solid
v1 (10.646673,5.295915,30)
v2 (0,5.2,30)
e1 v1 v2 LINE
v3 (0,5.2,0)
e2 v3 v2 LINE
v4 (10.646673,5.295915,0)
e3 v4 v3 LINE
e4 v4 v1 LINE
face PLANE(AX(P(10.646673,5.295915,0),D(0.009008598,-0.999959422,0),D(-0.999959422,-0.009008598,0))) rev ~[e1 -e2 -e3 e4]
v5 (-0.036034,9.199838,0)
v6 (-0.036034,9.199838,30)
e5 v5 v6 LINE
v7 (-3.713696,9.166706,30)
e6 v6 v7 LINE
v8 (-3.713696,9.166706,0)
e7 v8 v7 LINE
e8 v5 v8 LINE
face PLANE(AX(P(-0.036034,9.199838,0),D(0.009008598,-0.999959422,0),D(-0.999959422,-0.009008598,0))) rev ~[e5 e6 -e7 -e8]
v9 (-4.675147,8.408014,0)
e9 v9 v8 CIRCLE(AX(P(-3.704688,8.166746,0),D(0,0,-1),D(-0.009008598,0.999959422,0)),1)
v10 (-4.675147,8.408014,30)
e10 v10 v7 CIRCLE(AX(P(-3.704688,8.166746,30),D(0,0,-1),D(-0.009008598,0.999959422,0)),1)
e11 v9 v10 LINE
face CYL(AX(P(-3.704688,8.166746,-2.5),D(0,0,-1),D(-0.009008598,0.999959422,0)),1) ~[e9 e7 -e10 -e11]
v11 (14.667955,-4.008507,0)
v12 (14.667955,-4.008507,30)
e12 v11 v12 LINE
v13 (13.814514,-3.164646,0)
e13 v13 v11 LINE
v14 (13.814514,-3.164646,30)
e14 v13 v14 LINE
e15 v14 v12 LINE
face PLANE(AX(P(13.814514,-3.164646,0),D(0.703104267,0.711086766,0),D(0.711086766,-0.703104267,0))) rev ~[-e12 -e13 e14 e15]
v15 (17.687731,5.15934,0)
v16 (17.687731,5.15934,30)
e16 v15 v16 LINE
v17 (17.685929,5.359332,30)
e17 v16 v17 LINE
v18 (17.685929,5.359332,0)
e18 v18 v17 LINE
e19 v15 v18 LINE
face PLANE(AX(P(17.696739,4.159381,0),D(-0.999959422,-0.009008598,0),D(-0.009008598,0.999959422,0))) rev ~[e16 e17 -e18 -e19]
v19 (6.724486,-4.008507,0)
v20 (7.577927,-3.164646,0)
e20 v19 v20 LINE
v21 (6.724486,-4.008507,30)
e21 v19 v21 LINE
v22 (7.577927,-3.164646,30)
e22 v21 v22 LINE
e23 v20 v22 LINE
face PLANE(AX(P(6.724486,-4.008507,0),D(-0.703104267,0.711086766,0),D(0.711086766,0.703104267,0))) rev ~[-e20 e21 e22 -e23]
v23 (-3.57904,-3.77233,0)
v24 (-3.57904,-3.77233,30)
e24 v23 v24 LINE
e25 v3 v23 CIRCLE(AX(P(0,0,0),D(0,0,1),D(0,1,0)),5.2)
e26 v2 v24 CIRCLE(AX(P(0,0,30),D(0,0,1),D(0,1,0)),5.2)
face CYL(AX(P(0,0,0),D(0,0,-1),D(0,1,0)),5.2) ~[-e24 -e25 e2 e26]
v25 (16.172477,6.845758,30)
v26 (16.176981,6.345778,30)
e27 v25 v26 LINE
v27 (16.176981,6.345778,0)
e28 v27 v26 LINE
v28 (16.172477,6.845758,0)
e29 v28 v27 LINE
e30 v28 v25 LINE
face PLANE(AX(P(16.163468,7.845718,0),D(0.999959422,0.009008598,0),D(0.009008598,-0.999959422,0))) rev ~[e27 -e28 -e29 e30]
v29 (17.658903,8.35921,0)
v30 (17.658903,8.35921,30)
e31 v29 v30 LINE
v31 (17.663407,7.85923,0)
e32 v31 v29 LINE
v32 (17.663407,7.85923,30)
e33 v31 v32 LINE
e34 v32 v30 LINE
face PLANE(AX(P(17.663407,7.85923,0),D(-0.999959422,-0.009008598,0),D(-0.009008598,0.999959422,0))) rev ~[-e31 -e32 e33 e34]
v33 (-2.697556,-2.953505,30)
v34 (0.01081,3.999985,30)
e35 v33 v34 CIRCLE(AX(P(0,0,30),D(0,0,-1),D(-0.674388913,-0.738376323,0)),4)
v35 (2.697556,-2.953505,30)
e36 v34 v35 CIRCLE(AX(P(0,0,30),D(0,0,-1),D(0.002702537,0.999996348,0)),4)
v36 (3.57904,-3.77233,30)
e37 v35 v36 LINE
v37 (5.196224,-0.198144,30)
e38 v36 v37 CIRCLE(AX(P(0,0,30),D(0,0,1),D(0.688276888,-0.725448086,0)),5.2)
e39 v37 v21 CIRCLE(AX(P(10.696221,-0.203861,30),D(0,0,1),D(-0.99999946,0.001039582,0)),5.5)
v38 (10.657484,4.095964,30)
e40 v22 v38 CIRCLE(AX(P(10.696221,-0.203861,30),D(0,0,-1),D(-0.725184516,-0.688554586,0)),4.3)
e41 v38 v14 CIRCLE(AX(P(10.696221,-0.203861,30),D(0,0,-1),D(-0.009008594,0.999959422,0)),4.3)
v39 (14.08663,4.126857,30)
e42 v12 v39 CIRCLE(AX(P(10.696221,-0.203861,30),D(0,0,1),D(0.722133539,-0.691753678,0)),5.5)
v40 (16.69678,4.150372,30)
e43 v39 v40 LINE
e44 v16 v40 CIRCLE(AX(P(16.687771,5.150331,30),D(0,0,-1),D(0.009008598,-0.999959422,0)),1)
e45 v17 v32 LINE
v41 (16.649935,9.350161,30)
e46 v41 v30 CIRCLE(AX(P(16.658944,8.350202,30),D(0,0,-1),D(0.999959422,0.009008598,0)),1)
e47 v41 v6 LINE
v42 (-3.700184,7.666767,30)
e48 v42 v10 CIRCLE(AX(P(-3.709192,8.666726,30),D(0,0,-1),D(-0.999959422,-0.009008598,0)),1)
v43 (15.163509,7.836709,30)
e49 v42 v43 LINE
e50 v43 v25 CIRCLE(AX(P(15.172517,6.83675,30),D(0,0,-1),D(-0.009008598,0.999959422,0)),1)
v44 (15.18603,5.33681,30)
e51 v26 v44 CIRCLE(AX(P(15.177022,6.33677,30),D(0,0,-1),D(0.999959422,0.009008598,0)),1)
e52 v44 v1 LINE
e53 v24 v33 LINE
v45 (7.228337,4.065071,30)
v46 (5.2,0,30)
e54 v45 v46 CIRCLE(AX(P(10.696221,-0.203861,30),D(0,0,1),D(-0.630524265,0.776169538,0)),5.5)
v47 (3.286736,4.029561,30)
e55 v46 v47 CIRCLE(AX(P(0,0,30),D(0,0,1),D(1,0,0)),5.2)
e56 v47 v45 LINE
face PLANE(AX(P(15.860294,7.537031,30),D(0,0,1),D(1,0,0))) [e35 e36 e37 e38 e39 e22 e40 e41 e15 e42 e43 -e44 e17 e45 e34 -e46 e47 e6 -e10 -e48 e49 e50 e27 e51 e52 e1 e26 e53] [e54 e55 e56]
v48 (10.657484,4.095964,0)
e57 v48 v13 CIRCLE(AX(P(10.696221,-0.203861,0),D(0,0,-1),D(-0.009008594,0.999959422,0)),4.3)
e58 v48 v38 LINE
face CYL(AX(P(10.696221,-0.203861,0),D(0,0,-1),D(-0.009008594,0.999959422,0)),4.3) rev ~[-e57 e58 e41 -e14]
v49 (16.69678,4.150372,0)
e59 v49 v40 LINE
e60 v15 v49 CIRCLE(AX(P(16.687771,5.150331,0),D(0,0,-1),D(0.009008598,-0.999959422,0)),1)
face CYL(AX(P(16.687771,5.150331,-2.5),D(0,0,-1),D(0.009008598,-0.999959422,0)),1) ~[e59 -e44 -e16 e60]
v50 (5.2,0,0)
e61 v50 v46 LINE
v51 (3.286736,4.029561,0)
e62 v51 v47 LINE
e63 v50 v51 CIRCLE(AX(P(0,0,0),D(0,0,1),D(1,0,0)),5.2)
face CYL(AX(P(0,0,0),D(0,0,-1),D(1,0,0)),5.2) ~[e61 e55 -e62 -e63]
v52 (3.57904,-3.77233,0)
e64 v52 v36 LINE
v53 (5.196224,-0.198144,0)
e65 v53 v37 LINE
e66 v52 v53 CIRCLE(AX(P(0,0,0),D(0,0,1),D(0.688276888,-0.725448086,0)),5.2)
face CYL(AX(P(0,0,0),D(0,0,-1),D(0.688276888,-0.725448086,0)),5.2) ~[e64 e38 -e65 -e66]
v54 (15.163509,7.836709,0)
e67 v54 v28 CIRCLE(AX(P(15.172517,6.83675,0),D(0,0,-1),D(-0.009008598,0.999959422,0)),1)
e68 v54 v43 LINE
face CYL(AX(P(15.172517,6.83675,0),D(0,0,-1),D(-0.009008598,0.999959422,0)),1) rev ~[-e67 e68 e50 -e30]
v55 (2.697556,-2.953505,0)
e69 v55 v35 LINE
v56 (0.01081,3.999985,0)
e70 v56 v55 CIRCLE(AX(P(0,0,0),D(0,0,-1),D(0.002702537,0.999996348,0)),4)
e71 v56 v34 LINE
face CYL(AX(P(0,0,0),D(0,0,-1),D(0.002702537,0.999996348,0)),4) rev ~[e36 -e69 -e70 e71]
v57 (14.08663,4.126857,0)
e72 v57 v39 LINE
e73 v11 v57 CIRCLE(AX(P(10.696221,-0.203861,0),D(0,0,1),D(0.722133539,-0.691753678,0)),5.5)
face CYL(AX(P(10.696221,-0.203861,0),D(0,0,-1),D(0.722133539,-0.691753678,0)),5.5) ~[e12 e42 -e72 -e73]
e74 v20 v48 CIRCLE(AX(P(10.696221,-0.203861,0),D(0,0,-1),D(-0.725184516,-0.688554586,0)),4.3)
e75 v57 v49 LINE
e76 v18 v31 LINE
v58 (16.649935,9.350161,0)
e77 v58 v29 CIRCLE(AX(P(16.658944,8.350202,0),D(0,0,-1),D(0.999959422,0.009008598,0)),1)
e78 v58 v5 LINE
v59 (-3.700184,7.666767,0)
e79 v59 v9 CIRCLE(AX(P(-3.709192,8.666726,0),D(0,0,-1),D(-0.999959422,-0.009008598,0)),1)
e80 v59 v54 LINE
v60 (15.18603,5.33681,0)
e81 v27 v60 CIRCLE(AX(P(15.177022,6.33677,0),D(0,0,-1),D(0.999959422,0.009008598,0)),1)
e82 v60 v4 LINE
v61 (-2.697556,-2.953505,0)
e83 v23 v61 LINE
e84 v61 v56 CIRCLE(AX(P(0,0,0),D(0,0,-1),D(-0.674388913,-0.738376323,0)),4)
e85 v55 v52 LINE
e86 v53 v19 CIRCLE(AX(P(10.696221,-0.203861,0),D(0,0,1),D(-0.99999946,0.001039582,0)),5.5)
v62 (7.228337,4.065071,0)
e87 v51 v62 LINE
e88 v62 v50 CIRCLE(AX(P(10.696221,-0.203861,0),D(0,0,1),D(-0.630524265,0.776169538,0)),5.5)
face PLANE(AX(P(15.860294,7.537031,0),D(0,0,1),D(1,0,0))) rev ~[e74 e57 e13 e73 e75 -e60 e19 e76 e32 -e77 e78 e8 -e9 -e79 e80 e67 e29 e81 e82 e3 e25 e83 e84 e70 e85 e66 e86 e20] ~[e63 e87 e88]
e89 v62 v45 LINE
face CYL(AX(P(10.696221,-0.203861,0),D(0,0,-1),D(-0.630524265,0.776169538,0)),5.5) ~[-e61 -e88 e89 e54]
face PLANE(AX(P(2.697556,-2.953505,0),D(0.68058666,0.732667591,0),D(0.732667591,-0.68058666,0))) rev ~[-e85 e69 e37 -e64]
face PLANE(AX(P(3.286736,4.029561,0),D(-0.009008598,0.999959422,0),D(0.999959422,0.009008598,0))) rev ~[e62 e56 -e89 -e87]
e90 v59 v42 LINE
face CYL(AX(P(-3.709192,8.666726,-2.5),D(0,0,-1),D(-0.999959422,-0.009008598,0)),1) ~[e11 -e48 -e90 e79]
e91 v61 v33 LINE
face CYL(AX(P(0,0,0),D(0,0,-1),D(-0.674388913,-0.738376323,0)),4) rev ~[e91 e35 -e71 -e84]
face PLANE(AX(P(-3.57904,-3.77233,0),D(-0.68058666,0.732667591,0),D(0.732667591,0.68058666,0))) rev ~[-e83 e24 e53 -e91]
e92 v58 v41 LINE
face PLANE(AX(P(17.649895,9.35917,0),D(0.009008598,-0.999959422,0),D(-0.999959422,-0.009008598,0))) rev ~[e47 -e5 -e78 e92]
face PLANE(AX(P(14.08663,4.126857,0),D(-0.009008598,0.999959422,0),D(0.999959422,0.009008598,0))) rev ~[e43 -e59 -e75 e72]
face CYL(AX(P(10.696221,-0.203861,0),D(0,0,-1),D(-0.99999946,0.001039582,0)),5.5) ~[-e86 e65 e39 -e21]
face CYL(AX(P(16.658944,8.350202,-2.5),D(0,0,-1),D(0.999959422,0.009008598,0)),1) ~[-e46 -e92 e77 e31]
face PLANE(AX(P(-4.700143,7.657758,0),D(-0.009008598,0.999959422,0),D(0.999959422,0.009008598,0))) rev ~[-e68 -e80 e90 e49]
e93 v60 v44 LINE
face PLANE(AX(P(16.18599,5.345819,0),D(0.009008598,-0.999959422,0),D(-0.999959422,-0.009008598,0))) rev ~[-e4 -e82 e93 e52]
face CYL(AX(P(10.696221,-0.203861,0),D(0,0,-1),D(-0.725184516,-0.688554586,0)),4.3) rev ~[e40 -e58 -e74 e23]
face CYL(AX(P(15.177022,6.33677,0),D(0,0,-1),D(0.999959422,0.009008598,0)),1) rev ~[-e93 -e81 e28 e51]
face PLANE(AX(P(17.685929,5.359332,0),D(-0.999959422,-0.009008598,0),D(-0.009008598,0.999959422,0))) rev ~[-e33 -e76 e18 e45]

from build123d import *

# Parameters (mm, degrees)
F1_DEPTH    = 30
F2_T1_DEPTH = 30
F2_T3_DEPTH = 35


# Not quite as in the source:
# - a fillet or chamfer that OpenCascade refuses, or shapes differently, is made with other operations: its cross-section is extruded or revolved along the edge and cut away or added
# - ends of sketch curves that miss each other by under 0.0002 mm in the source are joined


with BuildPart() as f1:
    # F0 (on Top) → F1 (new body)
    with BuildSketch(Plane.XY):
        with BuildLine():
            ThreePointArc((0.0108101467, 3.9999853926), (3.7311619501, 1.441676282), (2.6975556514, -2.9535052916))
            Line((2.6975556514, -2.9535052916), (3.5790398152, -3.7723300494))
            ThreePointArc((3.5790398152, -3.7723300494), (4.7376169007, -2.1435918693), (5.1962235425, -0.1981436252))
            ThreePointArc((5.1962235425, -0.1981436252), (5.1972192437, -0.0990548017), (5.2, 0))
            ThreePointArc((5.2, 0), (4.6973944029, 2.2303555374), (3.2867362218, 4.0295613915))
            Line((3.2867362218, 4.0295613915), (0.0108101467, 3.9999853926))
        make_face()
        with BuildLine():
            ThreePointArc((-2.6975556514, -2.9535052916), (-3.7272521414, 1.4517546193), (0.0108101467, 3.9999853926))
            Line((0.0108101467, 3.9999853926), (3.2867362218, 4.0295613915))
            ThreePointArc((3.2867362218, 4.0295613915), (1.7444599113, 4.8986589612), (0, 5.2))
            ThreePointArc((0, 5.2), (-4.8299128489, 1.9266400472), (-3.5790398152, -3.7723300494))
            Line((-3.5790398152, -3.7723300494), (-2.6975556514, -2.9535052916))
        make_face()
        with BuildLine():
            ThreePointArc((0, 5.2), (1.7444599113, 4.8986589612), (3.2867362218, 4.0295613915))
            Line((3.2867362218, 4.0295613915), (7.2283371129, 4.065071131))
            ThreePointArc((7.2283371129, 4.065071131), (8.8329374117, 4.9709020374), (10.646673336, 5.2959154939))
            Line((10.646673336, 5.2959154939), (0, 5.2))
        make_face()
        with BuildLine():
            ThreePointArc((5.2, 0), (5.1972192437, -0.0990548017), (5.1962235425, -0.1981436252))
            ThreePointArc((5.1962235425, -0.1981436252), (5.1990557999, -0.099089805), (5.2, 0))
        make_face()
        with BuildLine():
            ThreePointArc((5.2, 0), (5.1990557999, -0.099089805), (5.1962235425, -0.1981436252))
            ThreePointArc((5.1962235425, -0.1981436252), (5.5915030666, -2.2512643656), (6.7244861035, -4.0085065559))
            Line((6.7244861035, -4.0085065559), (7.5779271506, -3.1646460444))
            ThreePointArc((7.5779271506, -3.1646460444), (6.7375812297, 1.4751784497), (10.6574836162, 4.0959641875))
            Line((10.6574836162, 4.0959641875), (7.2283371129, 4.065071131))
            ThreePointArc((7.2283371129, 4.065071131), (5.7748395568, 2.2517463212), (5.2, 0))
        make_face()
        with BuildLine():
            ThreePointArc((10.646673336, 5.2959154939), (8.8329374117, 4.9709020374), (7.2283371129, 4.065071131))
            Line((7.2283371129, 4.065071131), (10.6574836162, 4.0959641875))
            Line((10.6574836162, 4.0959641875), (14.0866300839, 4.1268572436))
            ThreePointArc((14.0866300839, 4.1268572436), (12.4659704087, 5.0036318817), (10.646673336, 5.2959154939))
        make_face()
        with BuildLine():
            Line((16.1859897918, 5.345818995), (10.646673336, 5.2959154939))
            ThreePointArc((10.646673336, 5.2959154939), (12.4659704087, 5.0036318817), (14.0866300839, 4.1268572436))
            Line((14.0866300839, 4.1268572436), (17.6967392423, 4.1593805861))
            Line((17.6967392423, 4.1593805861), (17.6859289245, 5.3593318922))
            Line((17.6859289245, 5.3593318922), (16.1859897918, 5.345818995))
        make_face()
        with BuildLine():
            Line((14.0866300839, 4.1268572436), (10.6574836162, 4.0959641875))
            ThreePointArc((10.6574836162, 4.0959641875), (14.6395734892, 1.510772092), (13.8145139904, -3.1646460444))
            Line((13.8145139904, -3.1646460444), (14.6679550375, -4.0085065559))
            ThreePointArc((14.6679550375, -4.0085065559), (16.1822325131, 0.1881501089), (14.0866300839, 4.1268572436))
        make_face()
        Polygon((16.1634682964, 7.8457175493), (16.1859897918, 5.345818995), (17.6859289245, 5.3593318922), (17.6634074291, 7.8592304466), align=None)
        Polygon((-0.0225214954, 7.6998985544), (16.1634682964, 7.8457175493), (17.6634074291, 7.8592304466), (17.6498945318, 9.3591695792), (-0.0360343926, 9.199837687), (-4.7136558579, 9.1576971649), (-4.7001429606, 7.6577580323), align=None)
    extrude(amount=F1_DEPTH)

    # F2: fillet of radius 1 on 6 edges, made by hand

    # F2_s2 → F2_t1 (join)
    with BuildSketch(Plane.XY):
        with BuildLine():
            ThreePointArc((15.1635088747, 7.8367089512), (15.87322552, 7.5501976583), (16.1724768946, 6.8457581276))
            Line((16.1724768946, 6.8457581276), (16.1634682964, 7.8457175493))
            Line((16.1634682964, 7.8457175493), (15.1635088747, 7.8367089512))
        make_face()
        with BuildLine():
            ThreePointArc((16.1769811937, 6.3457784167), (15.8904699008, 5.6360617714), (15.1860303701, 5.3368103968))
            Line((15.1860303701, 5.3368103968), (16.1859897918, 5.345818995))
            Line((16.1859897918, 5.345818995), (16.1769811937, 6.3457784167))
        make_face()
    extrude(amount=F2_T1_DEPTH)

    # F2_s4 → F2_t3 (cut)
    with BuildSketch(Plane.XY.offset(-2.5)):
        with BuildLine():
            ThreePointArc((16.6967798205, 4.1503719879), (17.4012193512, 4.4496233625), (17.6877306441, 5.1593400078))
            Line((17.6877306441, 5.1593400078), (17.6967392423, 4.1593805861))
            Line((17.6967392423, 4.1593805861), (16.6967798205, 4.1503719879))
        make_face()
        with BuildLine():
            ThreePointArc((17.65890313, 8.3592101575), (17.3596517554, 9.0636496882), (16.6499351101, 9.3501609811))
            Line((16.6499351101, 9.3501609811), (17.6498945318, 9.3591695792))
            Line((17.6498945318, 9.3591695792), (17.65890313, 8.3592101575))
        make_face()
        with BuildLine():
            ThreePointArc((-3.7136964361, 9.1667057631), (-4.4181359668, 8.8674543885), (-4.7046472597, 8.1577377432))
            Line((-4.7046472597, 8.1577377432), (-4.7136558579, 9.1576971649))
            Line((-4.7136558579, 9.1576971649), (-3.7136964361, 9.1667057631))
        make_face()
        with BuildLine():
            ThreePointArc((-4.7091515588, 8.657717454), (-4.4099001842, 7.9532779233), (-3.7001835389, 7.6667666304))
            Line((-3.7001835389, 7.6667666304), (-4.7001429606, 7.6577580323))
            Line((-4.7001429606, 7.6577580323), (-4.7091515588, 8.657717454))
        make_face()
    extrude(amount=F2_T3_DEPTH, mode=Mode.SUBTRACT)


solid = f1.part
